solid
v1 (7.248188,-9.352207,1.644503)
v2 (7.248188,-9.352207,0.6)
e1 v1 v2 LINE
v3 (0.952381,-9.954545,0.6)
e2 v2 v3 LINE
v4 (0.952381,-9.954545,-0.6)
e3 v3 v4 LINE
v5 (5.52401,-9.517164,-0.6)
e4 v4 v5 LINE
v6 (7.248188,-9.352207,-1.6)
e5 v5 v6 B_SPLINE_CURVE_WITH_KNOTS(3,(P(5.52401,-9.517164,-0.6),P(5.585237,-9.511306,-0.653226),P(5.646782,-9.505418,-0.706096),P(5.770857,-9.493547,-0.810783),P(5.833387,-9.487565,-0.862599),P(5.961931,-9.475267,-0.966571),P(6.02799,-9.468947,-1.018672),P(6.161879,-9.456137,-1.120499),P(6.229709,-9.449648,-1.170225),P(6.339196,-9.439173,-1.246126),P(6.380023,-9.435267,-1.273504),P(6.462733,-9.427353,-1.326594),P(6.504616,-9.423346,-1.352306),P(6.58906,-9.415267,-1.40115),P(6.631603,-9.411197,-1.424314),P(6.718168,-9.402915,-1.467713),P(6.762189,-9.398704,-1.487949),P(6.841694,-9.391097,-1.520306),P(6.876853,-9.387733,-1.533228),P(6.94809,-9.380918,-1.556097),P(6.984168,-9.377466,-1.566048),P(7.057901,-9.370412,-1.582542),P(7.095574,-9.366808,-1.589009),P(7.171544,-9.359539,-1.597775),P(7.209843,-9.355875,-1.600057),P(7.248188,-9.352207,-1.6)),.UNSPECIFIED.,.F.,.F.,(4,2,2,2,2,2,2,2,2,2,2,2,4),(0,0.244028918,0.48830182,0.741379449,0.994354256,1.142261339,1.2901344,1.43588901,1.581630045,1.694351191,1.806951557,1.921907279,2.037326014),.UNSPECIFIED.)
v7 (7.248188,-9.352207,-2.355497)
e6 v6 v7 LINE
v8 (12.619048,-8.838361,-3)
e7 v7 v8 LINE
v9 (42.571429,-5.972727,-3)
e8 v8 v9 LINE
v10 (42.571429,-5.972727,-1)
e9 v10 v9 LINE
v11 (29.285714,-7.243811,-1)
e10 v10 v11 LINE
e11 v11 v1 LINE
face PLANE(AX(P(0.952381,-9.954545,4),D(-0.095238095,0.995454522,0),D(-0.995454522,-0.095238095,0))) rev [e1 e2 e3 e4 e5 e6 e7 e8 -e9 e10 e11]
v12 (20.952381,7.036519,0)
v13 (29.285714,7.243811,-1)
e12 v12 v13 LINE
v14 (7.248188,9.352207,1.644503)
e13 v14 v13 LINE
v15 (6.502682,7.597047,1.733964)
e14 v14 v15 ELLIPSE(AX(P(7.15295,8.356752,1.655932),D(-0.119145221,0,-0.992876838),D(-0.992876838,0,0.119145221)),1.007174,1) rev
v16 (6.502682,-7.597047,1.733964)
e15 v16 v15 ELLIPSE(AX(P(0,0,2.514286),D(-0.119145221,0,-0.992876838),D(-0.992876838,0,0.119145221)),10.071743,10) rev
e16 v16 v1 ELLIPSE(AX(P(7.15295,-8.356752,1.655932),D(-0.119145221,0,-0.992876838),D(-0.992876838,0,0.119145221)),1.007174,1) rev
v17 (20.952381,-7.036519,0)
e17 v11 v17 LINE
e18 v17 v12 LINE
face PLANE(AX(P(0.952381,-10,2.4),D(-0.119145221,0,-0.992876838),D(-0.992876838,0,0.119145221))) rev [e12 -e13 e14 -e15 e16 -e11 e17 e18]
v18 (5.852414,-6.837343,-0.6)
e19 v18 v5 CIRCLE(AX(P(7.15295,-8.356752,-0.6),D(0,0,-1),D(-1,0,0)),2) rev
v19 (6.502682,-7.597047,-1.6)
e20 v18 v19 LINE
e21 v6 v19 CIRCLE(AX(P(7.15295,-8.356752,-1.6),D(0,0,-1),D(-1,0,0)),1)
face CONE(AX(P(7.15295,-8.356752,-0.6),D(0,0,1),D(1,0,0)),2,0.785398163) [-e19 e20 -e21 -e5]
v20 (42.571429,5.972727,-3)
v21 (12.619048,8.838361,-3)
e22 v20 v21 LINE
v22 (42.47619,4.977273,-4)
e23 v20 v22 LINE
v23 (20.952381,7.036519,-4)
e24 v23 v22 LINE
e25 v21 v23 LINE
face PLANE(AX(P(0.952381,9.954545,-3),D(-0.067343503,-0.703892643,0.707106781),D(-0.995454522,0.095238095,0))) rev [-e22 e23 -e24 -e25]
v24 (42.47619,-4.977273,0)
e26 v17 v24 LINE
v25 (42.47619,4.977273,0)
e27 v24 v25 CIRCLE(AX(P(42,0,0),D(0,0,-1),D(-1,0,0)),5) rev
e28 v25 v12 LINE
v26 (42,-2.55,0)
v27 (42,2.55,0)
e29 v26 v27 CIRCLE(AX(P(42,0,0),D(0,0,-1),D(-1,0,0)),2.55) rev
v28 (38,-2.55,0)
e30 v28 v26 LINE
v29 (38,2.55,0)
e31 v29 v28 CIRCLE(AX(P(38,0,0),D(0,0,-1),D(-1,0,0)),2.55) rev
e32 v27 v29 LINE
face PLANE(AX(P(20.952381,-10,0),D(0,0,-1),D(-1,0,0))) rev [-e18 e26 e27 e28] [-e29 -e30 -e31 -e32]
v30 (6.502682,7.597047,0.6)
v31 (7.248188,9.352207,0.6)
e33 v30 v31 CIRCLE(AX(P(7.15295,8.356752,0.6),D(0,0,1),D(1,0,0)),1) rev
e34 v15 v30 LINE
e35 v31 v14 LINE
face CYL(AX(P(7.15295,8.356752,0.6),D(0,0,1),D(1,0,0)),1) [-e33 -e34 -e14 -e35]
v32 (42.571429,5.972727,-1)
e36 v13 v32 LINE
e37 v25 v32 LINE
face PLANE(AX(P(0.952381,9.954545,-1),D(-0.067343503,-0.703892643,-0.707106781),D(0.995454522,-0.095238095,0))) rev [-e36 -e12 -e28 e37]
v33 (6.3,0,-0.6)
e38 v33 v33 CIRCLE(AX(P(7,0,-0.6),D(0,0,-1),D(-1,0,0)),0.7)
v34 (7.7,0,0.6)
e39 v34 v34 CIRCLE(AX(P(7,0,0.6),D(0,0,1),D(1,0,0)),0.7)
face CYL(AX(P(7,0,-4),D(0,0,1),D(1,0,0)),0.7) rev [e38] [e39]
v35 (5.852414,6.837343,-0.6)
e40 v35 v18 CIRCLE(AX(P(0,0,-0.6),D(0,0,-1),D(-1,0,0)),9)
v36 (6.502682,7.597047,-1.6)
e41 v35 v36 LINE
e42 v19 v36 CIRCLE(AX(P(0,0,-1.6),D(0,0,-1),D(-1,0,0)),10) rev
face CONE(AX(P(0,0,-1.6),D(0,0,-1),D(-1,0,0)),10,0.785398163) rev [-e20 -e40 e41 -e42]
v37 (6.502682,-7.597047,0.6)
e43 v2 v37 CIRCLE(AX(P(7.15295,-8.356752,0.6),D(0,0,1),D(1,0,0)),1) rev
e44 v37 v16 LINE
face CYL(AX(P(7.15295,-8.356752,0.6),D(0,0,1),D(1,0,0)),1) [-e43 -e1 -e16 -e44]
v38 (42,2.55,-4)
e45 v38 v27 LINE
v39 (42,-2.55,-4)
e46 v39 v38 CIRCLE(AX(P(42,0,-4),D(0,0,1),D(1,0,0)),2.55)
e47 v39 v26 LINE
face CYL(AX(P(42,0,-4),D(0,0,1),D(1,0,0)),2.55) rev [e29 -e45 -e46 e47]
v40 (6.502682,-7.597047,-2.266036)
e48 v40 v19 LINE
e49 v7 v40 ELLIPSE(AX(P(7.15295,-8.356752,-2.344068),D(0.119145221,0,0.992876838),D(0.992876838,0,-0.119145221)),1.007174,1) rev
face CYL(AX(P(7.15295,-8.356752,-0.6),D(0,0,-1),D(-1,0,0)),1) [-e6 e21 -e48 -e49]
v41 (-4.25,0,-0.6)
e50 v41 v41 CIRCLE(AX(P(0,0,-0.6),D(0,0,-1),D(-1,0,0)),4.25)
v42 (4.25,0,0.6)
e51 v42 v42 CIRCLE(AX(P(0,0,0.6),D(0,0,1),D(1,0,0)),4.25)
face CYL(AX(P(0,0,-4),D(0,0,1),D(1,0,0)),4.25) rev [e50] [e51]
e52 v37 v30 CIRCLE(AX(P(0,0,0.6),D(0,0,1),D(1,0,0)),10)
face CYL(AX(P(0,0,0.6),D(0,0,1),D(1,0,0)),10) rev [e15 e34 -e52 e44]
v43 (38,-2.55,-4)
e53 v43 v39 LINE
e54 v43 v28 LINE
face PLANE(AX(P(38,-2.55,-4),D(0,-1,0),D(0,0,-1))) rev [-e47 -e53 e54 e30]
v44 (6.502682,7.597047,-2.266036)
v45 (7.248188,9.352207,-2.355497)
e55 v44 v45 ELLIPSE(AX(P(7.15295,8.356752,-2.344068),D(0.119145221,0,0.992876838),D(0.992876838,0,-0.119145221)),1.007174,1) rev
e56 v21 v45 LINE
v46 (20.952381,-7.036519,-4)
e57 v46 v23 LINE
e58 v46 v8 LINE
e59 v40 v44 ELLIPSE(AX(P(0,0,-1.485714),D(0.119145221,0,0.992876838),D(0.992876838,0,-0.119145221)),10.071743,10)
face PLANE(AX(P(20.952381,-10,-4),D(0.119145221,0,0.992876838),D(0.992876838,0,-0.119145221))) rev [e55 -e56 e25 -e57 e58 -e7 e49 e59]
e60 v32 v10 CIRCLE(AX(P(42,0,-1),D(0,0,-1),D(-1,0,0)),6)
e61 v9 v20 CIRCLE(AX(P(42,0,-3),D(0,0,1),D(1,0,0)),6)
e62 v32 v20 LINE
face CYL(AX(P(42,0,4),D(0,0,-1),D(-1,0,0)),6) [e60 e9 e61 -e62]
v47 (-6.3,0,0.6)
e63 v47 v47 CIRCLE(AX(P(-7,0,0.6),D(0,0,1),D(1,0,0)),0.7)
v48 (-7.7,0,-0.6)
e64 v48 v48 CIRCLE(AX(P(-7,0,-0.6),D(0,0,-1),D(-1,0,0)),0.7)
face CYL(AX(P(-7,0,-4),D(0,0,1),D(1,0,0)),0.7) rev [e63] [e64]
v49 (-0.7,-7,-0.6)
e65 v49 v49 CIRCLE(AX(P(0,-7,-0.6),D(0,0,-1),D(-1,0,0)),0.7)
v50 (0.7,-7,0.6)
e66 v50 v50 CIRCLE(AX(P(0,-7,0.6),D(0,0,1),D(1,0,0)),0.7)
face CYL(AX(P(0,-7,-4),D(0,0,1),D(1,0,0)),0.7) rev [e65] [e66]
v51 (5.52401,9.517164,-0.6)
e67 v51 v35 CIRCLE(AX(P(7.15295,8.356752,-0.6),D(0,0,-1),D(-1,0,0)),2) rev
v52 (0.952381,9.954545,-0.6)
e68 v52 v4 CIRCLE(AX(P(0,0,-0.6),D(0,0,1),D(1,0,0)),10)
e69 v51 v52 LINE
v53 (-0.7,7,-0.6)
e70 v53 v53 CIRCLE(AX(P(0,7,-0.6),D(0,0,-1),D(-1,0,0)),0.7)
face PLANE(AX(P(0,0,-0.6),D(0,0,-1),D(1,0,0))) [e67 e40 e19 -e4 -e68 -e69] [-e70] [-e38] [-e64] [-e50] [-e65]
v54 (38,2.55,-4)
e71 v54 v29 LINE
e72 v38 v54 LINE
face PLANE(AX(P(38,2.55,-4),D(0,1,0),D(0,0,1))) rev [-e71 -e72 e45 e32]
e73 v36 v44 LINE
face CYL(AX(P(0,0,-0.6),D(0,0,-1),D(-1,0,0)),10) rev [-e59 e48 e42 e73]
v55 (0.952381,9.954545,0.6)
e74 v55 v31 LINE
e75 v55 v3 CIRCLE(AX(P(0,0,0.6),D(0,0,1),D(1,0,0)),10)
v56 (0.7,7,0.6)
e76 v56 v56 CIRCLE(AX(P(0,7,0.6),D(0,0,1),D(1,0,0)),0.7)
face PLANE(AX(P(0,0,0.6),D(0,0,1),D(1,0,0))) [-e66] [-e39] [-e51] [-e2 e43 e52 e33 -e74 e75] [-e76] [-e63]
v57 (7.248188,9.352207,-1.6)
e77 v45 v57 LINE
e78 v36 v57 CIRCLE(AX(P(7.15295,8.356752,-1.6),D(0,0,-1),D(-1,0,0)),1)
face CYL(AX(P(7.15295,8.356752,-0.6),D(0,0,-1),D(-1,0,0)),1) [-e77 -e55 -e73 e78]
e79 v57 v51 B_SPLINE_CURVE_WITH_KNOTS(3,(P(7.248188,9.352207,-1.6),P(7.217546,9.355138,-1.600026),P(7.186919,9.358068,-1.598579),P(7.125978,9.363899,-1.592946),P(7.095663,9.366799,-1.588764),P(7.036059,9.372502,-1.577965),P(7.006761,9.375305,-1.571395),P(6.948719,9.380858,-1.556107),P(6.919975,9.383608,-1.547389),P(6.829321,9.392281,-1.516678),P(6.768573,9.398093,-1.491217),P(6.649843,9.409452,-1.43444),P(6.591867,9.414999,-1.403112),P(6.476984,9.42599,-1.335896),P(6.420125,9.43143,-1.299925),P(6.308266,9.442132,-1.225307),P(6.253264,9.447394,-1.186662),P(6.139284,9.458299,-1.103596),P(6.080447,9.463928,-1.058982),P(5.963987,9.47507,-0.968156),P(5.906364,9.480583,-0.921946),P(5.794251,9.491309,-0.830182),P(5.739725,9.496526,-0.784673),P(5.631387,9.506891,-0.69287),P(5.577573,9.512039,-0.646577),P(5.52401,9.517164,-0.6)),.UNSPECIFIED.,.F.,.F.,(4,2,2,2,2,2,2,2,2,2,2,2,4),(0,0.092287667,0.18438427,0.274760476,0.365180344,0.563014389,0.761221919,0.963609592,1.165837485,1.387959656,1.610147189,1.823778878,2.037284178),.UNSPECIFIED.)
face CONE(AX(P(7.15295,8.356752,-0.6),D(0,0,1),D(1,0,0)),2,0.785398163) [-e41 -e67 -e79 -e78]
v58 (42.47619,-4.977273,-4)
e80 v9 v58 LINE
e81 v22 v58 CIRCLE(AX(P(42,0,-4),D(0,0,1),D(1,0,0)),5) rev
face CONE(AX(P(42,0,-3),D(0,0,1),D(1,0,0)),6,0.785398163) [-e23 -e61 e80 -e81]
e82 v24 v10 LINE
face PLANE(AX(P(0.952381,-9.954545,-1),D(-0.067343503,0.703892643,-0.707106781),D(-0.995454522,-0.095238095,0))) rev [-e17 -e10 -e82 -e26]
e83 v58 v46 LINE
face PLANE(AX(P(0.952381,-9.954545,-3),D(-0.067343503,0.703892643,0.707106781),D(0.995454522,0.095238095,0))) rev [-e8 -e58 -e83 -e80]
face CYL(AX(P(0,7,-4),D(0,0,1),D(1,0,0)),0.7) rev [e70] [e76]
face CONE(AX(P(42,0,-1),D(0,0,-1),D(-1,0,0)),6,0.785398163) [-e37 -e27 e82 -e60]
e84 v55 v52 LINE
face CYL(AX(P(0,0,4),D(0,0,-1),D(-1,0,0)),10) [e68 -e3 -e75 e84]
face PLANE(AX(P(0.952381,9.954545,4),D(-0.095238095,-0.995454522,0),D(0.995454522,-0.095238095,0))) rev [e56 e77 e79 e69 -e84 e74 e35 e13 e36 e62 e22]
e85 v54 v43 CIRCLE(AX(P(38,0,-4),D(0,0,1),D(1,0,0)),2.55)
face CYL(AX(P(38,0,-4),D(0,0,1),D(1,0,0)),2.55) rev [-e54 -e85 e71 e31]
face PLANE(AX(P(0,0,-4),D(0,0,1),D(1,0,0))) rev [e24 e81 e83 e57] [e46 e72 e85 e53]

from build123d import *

# Parameters (mm, degrees)
EXTRUDE_1_DEPTH          = 4
CUT_EXTRUDE_1_DEPTH      = 50.678969393496885
SKETCH_5_R               = 10
CUT_EXTRUDE_2_DEPTH      = 3.4
SKETCH_6_R               = 0.7
SKETCH_6_R_2             = 0.7000000000000005
CUT_EXTRUDE_3_DEPTH      = 50.24591353604885
SKETCH_8_R               = 4.25
CUT_EXTRUDE_5_DEPTH      = 50.24591353604885
CUT_EXTRUDE_7_DEPTH      = 50.193495504995376
CUT_EXTRUDE_7_DEPTH_BACK = 50.193495504995376
FILLET_1_R               = 1
CHAMFER_1_SIZE           = 1
CHAMFER_3_SIZE           = 1


with BuildPart() as part:
    # 草图1 → 凸台-拉伸1 (new, symmetric)
    with BuildSketch(Plane.XY):
        with BuildLine():
            Line((0.9523809523809523, 9.954545219222322), (42.57142857142857, 5.972727131533395))
            ThreePointArc((42.57142857142857, 5.972727131533395), (48, 0), (42.57142857142857, -5.972727131533395))
            Line((42.57142857142857, -5.972727131533395), (0.9523809523809523, -9.954545219222322))
            ThreePointArc((0.9523809523809523, -9.954545219222322), (-10.000000000000002, 1.22e-15), (0.9523809523809523, 9.954545219222322))
        make_face()
    extrude(amount=EXTRUDE_1_DEPTH, both=True)

    # 草图3 → 切除-拉伸1 (cut, through all)
    with BuildSketch(Plane.XY.offset(4)):
        with BuildLine():
            Line((38, 2.55), (42, 2.55))
            ThreePointArc((42, 2.55), (44.55, 0), (42, -2.55))
            Line((42, -2.55), (38, -2.55))
            ThreePointArc((38, -2.55), (35.45, 3.1e-16), (38, 2.55))
        make_face()
    extrude(amount=-CUT_EXTRUDE_1_DEPTH, mode=Mode.SUBTRACT)

    # 草图5 → 切除-拉伸2 (cut)
    with BuildSketch(Plane.XY.offset(4)):
        Circle(SKETCH_5_R)
    cut_extrude_2 = extrude(amount=-CUT_EXTRUDE_2_DEPTH, mode=Mode.SUBTRACT)

    # 镜向7: 切除-拉伸2 across plane
    add(cut_extrude_2.mirror(Plane.XY), mode=Mode.SUBTRACT)

    # 草图6 → 切除-拉伸3 (cut, through all)
    with BuildSketch(Plane.XY.offset(0.6000000000000003)):
        with Locations((0, 7)):
            Circle(SKETCH_6_R)
        with Locations((0, -7)):
            Circle(SKETCH_6_R)
        with Locations((7, -1.8e-15)):
            Circle(SKETCH_6_R_2)
        with Locations((-7, -1.8e-15)):
            Circle(SKETCH_6_R_2)
    extrude(amount=-CUT_EXTRUDE_3_DEPTH, mode=Mode.SUBTRACT)

    # 草图8 → 切除-拉伸5 (cut, through all)
    with BuildSketch(Plane.XY.offset(0.6000000000000003)):
        Circle(SKETCH_8_R)
    extrude(amount=-CUT_EXTRUDE_5_DEPTH, mode=Mode.SUBTRACT)

    # 草图10 → 切除-拉伸7 (cut, two sides: drawn at the far end of the back side and taken through both)
    with BuildSketch(Plane(origin=(0, 0, 0), x_dir=(1, 0, 0), z_dir=(0, 1, 0)).offset(-CUT_EXTRUDE_7_DEPTH_BACK)):
        Polygon((0.9523809523809523, 1.6000000000000003), (0.9523809523809523, 4), (20.952380952380953, 4.000000000000003), align=None)
        Polygon((0.9523809523809523, -2.4), (20.95238095238096, 6.07e-15), (48.00000000000001, 6.07e-15), (48.00000000000001, -4), (0.952380952380952, -4), align=None)
    extrude(amount=CUT_EXTRUDE_7_DEPTH + CUT_EXTRUDE_7_DEPTH_BACK, mode=Mode.SUBTRACT)

    # 圆角1
    fillet_1_edges = [part.edges().sort_by_distance(p)[0] for p in [
        (0.9523809523809526, 9.954545219222322, -1.0999999999999996),
        (0.9523809523809524, -9.954545219222322, -1.0999999999999996),
        (0.9523809523809526, 9.954545219222322, 1.5),
        (0.9523809523809524, -9.954545219222322, 1.5),
    ]]
    fillet(fillet_1_edges, radius=FILLET_1_R)

    # 倒角1
    chamfer_1_edges = [part.edges().sort_by_distance(p)[0] for p in [
        (31.761904761904763, 7.006906428907978, -4),
        (48, 1.33e-15, -4),
        (31.761904761904763, -7.006906428907978, -4),
        (48, 1.33e-15, -6.07e-15),
        (31.761904761904763, -7.006906428907977, -6.07e-15),
        (31.761904761904766, 7.006906428907978, -6.07e-15),
    ]]
    chamfer(chamfer_1_edges, length=CHAMFER_1_SIZE)

    # 倒角3
    # the kernel refuses this chamfer: 1 mm, written as the material it adds along each edge
    with BuildSketch(Plane(origin=(0, 0, -0.6000000000000001), x_dir=(0.6502681863563081, -0.7597047359421143, 0), z_dir=(-0.7597047359421143, -0.6502681863563081, 0))) as chamfer_3_piece_1:
        Polygon((10, -CHAMFER_3_SIZE), (9.999999999999998 - CHAMFER_3_SIZE, -2e-16), (9.999999999999998, 0), align=None)
    revolve(axis=Axis((0, 0, -0.6000000000000001), (0, 2e-17, 1)), revolution_arc=98.87634994501913)
    with BuildSketch(Plane(origin=(7.1529500499193945, 8.356752095363253, -0.6000000000000001), x_dir=(0.45453302112340566, -0.8907298876249914, 0), z_dir=(-0.8907298876249914, -0.45453302112340566, 0))) as chamfer_3_piece_2_section:
        Polygon((1.0000000000000004, -CHAMFER_3_SIZE), (1.0000000000000004 + CHAMFER_3_SIZE, 0), (1.0000000000000004, 0), align=None)
    chamfer_3_piece_2 = revolve(axis=Axis((7.1529500499193945, 8.356752095363253, -0.6000000000000001), (0, 0, 1)), revolution_arc=292.40328295994874, mode=Mode.PRIVATE)
    chamfer_3_piece_2 = split(chamfer_3_piece_2, bisect_by=Plane(origin=(6.105913725446883, 9.461491408882363, -0.9544569882762437), z_dir=(-0.09523809523809522, -0.995454521922232, 0)), keep=Keep.TOP, mode=Mode.PRIVATE)
    add(chamfer_3_piece_2)
    with BuildSketch(Plane(origin=(7.152950049919392, -8.356752095363255, -0.6000000000000001), x_dir=(0.4545330211234144, 0.8907298876249867, 0), z_dir=(-0.8907298876249867, 0.4545330211234144, 0))) as chamfer_3_piece_3_section:
        Polygon((1.0000000000000002 + CHAMFER_3_SIZE, 0), (0.9999999999999994, CHAMFER_3_SIZE), (1.0000000000000002, 0), align=None)
    chamfer_3_piece_3 = revolve(axis=Axis((7.152950049919392, -8.356752095363255, -0.6000000000000001), (0, 0, -1)), revolution_arc=292.40328295994846, mode=Mode.PRIVATE)
    chamfer_3_piece_3 = split(chamfer_3_piece_3, bisect_by=Plane(origin=(6.105912616149652, -9.46149151501213, -0.9544569410111913), z_dir=(-0.09523809523809522, 0.995454521922232, 0)), keep=Keep.TOP, mode=Mode.PRIVATE)
    add(chamfer_3_piece_3)


solid = part.part
